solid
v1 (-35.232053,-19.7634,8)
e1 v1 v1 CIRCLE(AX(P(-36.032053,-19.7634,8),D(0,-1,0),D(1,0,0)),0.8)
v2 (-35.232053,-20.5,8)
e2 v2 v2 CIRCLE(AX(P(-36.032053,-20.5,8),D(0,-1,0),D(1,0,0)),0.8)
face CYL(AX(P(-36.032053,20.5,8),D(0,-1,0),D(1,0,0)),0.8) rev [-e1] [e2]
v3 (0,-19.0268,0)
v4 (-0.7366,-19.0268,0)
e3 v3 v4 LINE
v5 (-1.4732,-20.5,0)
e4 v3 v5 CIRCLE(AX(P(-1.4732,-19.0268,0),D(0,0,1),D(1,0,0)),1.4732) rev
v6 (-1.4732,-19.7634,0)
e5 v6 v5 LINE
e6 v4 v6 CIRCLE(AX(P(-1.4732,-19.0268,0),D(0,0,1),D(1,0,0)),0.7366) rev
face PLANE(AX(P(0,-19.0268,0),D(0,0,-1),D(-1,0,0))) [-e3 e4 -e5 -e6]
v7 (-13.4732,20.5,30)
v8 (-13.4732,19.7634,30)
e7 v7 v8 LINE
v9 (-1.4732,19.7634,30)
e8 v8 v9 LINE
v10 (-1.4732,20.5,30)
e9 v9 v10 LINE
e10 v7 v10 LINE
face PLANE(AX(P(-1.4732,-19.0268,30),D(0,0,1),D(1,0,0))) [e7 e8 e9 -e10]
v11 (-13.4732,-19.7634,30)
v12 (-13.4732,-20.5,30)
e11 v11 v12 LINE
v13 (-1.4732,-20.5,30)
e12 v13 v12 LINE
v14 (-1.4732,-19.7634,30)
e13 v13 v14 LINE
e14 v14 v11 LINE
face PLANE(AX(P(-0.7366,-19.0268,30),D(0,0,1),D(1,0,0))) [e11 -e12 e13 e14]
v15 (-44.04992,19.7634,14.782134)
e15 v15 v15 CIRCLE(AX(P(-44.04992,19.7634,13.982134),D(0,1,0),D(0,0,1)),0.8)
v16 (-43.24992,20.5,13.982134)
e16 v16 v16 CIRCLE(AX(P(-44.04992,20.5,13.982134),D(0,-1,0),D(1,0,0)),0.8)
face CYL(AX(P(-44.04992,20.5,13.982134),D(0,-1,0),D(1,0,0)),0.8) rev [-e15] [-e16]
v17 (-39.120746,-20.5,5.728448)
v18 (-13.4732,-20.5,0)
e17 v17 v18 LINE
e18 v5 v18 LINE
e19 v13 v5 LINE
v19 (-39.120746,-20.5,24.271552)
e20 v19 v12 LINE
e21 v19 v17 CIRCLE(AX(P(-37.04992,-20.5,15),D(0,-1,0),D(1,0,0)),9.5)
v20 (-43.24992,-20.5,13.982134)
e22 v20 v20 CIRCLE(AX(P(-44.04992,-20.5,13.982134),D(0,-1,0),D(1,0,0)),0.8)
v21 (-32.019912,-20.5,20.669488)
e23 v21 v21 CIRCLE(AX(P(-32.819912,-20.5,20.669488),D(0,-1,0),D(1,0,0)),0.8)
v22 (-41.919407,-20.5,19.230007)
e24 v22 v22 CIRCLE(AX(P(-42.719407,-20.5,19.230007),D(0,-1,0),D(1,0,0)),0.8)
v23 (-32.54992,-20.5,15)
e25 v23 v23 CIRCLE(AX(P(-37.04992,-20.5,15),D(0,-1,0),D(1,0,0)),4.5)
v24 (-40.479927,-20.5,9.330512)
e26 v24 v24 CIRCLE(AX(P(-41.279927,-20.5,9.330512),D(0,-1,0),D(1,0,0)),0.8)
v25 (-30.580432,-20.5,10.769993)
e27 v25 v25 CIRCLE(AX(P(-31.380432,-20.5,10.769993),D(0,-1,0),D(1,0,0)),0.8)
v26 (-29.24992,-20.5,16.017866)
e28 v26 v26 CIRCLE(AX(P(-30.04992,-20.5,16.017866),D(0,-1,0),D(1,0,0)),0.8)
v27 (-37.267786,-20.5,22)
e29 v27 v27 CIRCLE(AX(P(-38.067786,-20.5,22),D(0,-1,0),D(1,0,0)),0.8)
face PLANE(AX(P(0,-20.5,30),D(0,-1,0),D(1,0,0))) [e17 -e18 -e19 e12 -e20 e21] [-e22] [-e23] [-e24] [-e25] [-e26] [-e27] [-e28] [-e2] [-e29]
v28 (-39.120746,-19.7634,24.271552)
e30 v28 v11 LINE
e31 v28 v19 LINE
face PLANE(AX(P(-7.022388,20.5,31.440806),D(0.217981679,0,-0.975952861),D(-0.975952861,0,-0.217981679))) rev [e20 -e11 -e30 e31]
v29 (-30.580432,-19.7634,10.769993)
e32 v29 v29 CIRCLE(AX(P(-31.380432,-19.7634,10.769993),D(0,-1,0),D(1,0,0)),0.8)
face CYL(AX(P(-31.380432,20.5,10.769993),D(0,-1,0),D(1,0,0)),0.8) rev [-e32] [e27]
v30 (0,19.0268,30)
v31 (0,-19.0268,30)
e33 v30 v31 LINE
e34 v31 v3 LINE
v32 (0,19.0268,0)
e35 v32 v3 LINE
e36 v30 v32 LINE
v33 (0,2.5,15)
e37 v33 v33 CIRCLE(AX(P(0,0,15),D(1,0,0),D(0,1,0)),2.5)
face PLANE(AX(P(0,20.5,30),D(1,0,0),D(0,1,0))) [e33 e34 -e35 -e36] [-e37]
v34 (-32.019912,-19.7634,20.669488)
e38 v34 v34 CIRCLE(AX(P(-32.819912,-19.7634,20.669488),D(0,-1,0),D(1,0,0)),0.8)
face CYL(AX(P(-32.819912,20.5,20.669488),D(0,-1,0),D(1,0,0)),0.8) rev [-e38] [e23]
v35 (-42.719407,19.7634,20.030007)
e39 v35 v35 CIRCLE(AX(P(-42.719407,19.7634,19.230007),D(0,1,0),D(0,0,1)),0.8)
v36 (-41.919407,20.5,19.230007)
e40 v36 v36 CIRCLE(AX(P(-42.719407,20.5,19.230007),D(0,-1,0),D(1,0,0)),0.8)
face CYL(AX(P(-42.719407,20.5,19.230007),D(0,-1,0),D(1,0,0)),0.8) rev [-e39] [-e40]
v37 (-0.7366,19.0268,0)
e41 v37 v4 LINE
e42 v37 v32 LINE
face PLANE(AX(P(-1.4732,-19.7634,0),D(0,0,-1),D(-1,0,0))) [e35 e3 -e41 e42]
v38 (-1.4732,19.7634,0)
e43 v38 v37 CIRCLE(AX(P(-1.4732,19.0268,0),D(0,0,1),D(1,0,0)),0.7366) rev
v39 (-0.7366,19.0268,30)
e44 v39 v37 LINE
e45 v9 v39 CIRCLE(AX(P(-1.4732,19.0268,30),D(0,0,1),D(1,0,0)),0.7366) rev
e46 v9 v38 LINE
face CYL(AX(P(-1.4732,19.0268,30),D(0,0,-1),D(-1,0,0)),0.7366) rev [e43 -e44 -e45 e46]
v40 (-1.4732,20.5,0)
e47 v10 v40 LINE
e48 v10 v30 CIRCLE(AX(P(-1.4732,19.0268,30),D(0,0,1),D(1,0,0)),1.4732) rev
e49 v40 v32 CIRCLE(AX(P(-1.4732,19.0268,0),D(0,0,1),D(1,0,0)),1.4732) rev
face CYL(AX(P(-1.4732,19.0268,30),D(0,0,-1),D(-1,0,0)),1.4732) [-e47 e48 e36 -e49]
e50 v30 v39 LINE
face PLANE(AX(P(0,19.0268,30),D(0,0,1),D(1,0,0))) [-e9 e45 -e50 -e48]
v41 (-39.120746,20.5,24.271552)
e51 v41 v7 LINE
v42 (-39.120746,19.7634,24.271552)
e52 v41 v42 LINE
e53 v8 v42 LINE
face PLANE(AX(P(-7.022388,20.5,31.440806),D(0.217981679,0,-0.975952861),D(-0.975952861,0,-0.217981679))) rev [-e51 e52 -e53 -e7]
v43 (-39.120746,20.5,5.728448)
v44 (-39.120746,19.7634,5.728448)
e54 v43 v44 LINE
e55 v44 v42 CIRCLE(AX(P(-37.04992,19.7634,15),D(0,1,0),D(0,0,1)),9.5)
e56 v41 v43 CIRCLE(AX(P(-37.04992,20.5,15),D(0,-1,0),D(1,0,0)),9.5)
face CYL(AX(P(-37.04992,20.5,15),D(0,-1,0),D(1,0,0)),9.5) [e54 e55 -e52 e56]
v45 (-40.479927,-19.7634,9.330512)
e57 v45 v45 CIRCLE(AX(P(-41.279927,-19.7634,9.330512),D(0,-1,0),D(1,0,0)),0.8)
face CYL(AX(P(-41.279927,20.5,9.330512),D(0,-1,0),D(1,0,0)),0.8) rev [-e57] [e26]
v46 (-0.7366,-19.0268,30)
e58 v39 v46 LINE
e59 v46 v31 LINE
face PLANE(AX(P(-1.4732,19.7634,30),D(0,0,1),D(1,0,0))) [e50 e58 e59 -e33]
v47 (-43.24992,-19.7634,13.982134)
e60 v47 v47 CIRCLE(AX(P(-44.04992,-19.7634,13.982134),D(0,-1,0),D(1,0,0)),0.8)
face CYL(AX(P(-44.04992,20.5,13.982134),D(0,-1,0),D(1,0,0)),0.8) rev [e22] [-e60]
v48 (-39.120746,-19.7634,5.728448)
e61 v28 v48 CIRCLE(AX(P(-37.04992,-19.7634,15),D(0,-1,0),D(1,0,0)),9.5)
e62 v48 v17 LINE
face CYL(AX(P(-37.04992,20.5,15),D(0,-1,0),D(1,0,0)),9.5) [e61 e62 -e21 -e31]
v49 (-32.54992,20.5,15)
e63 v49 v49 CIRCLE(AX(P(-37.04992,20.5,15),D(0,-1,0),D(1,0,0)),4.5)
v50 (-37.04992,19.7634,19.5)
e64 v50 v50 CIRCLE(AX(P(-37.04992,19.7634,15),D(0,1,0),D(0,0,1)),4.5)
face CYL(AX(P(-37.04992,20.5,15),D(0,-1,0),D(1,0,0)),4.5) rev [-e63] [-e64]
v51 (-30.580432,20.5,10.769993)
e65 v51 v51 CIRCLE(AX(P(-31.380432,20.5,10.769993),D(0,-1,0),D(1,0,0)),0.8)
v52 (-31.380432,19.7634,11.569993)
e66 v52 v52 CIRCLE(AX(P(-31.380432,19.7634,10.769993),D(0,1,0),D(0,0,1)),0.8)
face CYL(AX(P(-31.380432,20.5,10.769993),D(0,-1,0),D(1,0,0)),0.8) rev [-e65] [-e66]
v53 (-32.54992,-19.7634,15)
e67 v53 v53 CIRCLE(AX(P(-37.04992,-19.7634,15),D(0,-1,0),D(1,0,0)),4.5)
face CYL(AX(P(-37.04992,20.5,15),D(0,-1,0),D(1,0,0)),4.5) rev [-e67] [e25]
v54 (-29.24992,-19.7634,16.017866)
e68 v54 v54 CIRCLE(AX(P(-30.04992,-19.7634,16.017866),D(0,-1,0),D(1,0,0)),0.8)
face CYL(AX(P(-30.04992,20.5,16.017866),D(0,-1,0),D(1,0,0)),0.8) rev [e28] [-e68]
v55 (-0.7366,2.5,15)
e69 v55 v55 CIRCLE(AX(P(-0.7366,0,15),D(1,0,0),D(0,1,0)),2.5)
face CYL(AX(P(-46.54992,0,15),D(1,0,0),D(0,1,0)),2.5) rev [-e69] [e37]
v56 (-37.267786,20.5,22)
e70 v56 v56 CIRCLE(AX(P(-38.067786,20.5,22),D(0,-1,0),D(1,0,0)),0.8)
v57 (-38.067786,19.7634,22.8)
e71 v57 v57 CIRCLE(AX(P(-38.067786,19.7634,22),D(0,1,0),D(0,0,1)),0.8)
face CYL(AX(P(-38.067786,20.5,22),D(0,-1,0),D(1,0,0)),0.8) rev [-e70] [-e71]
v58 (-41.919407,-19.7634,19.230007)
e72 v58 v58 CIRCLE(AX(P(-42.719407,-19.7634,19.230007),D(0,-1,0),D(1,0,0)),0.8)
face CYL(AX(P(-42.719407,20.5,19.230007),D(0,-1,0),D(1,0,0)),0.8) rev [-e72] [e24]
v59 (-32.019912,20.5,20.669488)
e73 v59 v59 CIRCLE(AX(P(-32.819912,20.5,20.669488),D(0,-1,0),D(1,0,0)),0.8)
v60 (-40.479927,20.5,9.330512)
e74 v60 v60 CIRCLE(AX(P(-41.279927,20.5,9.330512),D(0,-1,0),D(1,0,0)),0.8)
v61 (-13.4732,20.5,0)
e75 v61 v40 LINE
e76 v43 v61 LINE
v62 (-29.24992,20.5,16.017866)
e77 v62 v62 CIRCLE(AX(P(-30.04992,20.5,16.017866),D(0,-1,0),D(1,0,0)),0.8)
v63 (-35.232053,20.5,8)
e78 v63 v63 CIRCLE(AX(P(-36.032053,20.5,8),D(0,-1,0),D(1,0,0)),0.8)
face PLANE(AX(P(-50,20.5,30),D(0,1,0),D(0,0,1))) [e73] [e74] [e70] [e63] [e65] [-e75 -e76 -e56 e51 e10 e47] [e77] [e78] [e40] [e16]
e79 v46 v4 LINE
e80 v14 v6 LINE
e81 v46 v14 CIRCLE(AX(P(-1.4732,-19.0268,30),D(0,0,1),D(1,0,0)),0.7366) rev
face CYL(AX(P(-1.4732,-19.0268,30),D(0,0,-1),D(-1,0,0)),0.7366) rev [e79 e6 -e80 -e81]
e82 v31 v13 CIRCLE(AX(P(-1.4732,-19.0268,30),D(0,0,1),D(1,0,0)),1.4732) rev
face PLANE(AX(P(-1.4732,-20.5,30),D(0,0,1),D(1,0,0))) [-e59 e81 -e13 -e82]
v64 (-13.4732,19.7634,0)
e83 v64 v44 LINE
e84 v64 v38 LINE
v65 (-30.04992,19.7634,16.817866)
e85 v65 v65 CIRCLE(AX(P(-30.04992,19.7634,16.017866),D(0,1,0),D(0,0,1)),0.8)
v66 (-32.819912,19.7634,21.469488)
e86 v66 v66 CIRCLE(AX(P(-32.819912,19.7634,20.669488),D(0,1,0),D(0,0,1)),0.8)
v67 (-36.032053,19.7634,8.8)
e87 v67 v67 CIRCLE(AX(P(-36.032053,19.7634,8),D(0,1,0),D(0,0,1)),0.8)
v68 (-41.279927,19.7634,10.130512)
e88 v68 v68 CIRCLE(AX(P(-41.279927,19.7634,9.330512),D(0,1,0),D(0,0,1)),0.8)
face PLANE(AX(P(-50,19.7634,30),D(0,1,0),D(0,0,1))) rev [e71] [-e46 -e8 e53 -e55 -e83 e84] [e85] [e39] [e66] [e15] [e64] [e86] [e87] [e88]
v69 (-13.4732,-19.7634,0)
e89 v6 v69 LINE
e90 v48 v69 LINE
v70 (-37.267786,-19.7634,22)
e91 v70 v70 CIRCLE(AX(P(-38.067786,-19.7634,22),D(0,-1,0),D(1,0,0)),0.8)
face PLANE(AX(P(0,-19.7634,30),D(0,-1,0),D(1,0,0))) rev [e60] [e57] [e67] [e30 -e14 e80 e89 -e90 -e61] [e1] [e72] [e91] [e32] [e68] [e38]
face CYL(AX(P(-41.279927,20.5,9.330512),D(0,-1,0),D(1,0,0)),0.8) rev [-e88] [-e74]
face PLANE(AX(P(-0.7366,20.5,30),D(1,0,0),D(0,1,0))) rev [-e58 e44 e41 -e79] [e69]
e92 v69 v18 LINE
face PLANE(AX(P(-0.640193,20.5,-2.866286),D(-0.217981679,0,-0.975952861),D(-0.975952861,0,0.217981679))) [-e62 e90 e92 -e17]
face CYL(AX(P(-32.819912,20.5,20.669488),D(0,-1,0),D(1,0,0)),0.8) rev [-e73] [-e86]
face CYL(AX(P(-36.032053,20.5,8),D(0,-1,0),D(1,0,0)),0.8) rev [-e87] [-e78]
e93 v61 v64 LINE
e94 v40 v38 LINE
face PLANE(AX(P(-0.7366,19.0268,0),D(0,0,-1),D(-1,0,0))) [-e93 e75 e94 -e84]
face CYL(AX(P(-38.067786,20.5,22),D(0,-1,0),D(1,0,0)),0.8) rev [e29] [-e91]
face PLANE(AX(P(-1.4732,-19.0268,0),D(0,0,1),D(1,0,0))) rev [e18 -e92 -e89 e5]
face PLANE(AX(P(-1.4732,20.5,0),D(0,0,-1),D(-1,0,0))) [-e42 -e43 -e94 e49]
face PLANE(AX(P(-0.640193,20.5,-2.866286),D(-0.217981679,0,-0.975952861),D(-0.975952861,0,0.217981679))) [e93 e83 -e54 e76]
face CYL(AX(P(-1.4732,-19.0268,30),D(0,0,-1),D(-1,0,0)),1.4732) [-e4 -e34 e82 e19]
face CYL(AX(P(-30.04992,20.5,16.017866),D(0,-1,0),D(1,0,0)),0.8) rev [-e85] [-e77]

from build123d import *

# Parameters (mm, degrees)
T_LE_DE_BASE_PLI_E1_DEPTH = 30
ESQUISSE13_R              = 4.5
ESQUISSE13_R_2            = 0.8
ENL_V_MAT_EXTRU_2_DEPTH   = 72.281133549
SKETCH1_R                 = 2.5
CUT_EXTRUDE1_DEPTH        = 60.052053397


# Sheet-metal steps are written as plain solids
with BuildPart() as part:
    # Esquisse1 → Tôle de base pliée1 (new body)
    with BuildSketch(Plane.XY):
        with BuildLine():
            Line((-50, 20.5), (-1.4732, 20.5))
            ThreePointArc((-1.4732, 20.5), (-0.43149029, 20.06850971), (0, 19.0268))
            Line((0, 19.0268), (0, -19.0268))
            ThreePointArc((0, -19.0268), (-0.43149029, -20.06850971), (-1.4732, -20.5))
            Line((-1.4732, -20.5), (-50, -20.5))
            Line((-50, -20.5), (-50, -19.7634))
            Line((-50, -19.7634), (-1.4732, -19.7634))
            ThreePointArc((-1.4732, -19.7634), (-0.952345145, -19.547654855), (-0.7366, -19.0268))
            Line((-0.7366, -19.0268), (-0.7366, 19.0268))
            ThreePointArc((-0.7366, 19.0268), (-0.952345145, 19.547654855), (-1.4732, 19.7634))
            Line((-1.4732, 19.7634), (-50, 19.7634))
            Line((-50, 19.7634), (-50, 20.5))
        make_face()
    extrude(amount=T_LE_DE_BASE_PLI_E1_DEPTH)

    # Esquisse13 → Enlèv. mat.-Extru.2 (cut, through all)
    with BuildSketch(Plane.XZ.offset(20.5)):
        with BuildLine():
            ThreePointArc((-46.549919552, 15), (-44.463516741, 20.940418901), (-39.120745506, 24.271552182))
            Line((-39.120745506, 24.271552182), (-13.4732, 30))
            Line((-13.4732, 30), (-50, 30))
            Line((-50, 30), (-50, 15))
            Line((-50, 15), (-46.549919552, 15))
        make_face()
        with BuildLine():
            Line((-13.4732, 0), (-39.120745506, 5.728447818))
            ThreePointArc((-39.120745506, 5.728447818), (-44.463516741, 9.059581099), (-46.549919552, 15))
            Line((-46.549919552, 15), (-50, 15))
            Line((-50, 15), (-50, 0))
            Line((-50, 0), (-13.4732, 0))
        make_face()
        with Locations((-37.049919552, 15)):
            Circle(ESQUISSE13_R)
        with Locations((-30.049919552, 16.017866465)):
            Circle(ESQUISSE13_R_2)
        with Locations((-32.819912364, 20.669487748)):
            Circle(ESQUISSE13_R_2)
        with Locations((-38.067786017, 22)):
            Circle(ESQUISSE13_R_2)
        with Locations((-42.7194073, 19.230007189)):
            Circle(ESQUISSE13_R_2)
        with Locations((-44.049919552, 13.982133535)):
            Circle(ESQUISSE13_R_2)
        with Locations((-41.279926741, 9.330512252)):
            Circle(ESQUISSE13_R_2)
        with Locations((-36.032053088, 8)):
            Circle(ESQUISSE13_R_2)
        with Locations((-31.380431805, 10.769992811)):
            Circle(ESQUISSE13_R_2)
    extrude(amount=-ENL_V_MAT_EXTRU_2_DEPTH, mode=Mode.SUBTRACT)

    # Sketch1 → Cut-Extrude1 (cut, through all)
    with BuildSketch(Plane(origin=(0, 0, 0), x_dir=(0, 0, -1), z_dir=(1, 0, 0))):
        with Locations(Location((-15, 0, 0), (0, 0, 90))):
            Circle(SKETCH1_R)
    extrude(amount=-CUT_EXTRUDE1_DEPTH, mode=Mode.SUBTRACT)


solid = part.part
